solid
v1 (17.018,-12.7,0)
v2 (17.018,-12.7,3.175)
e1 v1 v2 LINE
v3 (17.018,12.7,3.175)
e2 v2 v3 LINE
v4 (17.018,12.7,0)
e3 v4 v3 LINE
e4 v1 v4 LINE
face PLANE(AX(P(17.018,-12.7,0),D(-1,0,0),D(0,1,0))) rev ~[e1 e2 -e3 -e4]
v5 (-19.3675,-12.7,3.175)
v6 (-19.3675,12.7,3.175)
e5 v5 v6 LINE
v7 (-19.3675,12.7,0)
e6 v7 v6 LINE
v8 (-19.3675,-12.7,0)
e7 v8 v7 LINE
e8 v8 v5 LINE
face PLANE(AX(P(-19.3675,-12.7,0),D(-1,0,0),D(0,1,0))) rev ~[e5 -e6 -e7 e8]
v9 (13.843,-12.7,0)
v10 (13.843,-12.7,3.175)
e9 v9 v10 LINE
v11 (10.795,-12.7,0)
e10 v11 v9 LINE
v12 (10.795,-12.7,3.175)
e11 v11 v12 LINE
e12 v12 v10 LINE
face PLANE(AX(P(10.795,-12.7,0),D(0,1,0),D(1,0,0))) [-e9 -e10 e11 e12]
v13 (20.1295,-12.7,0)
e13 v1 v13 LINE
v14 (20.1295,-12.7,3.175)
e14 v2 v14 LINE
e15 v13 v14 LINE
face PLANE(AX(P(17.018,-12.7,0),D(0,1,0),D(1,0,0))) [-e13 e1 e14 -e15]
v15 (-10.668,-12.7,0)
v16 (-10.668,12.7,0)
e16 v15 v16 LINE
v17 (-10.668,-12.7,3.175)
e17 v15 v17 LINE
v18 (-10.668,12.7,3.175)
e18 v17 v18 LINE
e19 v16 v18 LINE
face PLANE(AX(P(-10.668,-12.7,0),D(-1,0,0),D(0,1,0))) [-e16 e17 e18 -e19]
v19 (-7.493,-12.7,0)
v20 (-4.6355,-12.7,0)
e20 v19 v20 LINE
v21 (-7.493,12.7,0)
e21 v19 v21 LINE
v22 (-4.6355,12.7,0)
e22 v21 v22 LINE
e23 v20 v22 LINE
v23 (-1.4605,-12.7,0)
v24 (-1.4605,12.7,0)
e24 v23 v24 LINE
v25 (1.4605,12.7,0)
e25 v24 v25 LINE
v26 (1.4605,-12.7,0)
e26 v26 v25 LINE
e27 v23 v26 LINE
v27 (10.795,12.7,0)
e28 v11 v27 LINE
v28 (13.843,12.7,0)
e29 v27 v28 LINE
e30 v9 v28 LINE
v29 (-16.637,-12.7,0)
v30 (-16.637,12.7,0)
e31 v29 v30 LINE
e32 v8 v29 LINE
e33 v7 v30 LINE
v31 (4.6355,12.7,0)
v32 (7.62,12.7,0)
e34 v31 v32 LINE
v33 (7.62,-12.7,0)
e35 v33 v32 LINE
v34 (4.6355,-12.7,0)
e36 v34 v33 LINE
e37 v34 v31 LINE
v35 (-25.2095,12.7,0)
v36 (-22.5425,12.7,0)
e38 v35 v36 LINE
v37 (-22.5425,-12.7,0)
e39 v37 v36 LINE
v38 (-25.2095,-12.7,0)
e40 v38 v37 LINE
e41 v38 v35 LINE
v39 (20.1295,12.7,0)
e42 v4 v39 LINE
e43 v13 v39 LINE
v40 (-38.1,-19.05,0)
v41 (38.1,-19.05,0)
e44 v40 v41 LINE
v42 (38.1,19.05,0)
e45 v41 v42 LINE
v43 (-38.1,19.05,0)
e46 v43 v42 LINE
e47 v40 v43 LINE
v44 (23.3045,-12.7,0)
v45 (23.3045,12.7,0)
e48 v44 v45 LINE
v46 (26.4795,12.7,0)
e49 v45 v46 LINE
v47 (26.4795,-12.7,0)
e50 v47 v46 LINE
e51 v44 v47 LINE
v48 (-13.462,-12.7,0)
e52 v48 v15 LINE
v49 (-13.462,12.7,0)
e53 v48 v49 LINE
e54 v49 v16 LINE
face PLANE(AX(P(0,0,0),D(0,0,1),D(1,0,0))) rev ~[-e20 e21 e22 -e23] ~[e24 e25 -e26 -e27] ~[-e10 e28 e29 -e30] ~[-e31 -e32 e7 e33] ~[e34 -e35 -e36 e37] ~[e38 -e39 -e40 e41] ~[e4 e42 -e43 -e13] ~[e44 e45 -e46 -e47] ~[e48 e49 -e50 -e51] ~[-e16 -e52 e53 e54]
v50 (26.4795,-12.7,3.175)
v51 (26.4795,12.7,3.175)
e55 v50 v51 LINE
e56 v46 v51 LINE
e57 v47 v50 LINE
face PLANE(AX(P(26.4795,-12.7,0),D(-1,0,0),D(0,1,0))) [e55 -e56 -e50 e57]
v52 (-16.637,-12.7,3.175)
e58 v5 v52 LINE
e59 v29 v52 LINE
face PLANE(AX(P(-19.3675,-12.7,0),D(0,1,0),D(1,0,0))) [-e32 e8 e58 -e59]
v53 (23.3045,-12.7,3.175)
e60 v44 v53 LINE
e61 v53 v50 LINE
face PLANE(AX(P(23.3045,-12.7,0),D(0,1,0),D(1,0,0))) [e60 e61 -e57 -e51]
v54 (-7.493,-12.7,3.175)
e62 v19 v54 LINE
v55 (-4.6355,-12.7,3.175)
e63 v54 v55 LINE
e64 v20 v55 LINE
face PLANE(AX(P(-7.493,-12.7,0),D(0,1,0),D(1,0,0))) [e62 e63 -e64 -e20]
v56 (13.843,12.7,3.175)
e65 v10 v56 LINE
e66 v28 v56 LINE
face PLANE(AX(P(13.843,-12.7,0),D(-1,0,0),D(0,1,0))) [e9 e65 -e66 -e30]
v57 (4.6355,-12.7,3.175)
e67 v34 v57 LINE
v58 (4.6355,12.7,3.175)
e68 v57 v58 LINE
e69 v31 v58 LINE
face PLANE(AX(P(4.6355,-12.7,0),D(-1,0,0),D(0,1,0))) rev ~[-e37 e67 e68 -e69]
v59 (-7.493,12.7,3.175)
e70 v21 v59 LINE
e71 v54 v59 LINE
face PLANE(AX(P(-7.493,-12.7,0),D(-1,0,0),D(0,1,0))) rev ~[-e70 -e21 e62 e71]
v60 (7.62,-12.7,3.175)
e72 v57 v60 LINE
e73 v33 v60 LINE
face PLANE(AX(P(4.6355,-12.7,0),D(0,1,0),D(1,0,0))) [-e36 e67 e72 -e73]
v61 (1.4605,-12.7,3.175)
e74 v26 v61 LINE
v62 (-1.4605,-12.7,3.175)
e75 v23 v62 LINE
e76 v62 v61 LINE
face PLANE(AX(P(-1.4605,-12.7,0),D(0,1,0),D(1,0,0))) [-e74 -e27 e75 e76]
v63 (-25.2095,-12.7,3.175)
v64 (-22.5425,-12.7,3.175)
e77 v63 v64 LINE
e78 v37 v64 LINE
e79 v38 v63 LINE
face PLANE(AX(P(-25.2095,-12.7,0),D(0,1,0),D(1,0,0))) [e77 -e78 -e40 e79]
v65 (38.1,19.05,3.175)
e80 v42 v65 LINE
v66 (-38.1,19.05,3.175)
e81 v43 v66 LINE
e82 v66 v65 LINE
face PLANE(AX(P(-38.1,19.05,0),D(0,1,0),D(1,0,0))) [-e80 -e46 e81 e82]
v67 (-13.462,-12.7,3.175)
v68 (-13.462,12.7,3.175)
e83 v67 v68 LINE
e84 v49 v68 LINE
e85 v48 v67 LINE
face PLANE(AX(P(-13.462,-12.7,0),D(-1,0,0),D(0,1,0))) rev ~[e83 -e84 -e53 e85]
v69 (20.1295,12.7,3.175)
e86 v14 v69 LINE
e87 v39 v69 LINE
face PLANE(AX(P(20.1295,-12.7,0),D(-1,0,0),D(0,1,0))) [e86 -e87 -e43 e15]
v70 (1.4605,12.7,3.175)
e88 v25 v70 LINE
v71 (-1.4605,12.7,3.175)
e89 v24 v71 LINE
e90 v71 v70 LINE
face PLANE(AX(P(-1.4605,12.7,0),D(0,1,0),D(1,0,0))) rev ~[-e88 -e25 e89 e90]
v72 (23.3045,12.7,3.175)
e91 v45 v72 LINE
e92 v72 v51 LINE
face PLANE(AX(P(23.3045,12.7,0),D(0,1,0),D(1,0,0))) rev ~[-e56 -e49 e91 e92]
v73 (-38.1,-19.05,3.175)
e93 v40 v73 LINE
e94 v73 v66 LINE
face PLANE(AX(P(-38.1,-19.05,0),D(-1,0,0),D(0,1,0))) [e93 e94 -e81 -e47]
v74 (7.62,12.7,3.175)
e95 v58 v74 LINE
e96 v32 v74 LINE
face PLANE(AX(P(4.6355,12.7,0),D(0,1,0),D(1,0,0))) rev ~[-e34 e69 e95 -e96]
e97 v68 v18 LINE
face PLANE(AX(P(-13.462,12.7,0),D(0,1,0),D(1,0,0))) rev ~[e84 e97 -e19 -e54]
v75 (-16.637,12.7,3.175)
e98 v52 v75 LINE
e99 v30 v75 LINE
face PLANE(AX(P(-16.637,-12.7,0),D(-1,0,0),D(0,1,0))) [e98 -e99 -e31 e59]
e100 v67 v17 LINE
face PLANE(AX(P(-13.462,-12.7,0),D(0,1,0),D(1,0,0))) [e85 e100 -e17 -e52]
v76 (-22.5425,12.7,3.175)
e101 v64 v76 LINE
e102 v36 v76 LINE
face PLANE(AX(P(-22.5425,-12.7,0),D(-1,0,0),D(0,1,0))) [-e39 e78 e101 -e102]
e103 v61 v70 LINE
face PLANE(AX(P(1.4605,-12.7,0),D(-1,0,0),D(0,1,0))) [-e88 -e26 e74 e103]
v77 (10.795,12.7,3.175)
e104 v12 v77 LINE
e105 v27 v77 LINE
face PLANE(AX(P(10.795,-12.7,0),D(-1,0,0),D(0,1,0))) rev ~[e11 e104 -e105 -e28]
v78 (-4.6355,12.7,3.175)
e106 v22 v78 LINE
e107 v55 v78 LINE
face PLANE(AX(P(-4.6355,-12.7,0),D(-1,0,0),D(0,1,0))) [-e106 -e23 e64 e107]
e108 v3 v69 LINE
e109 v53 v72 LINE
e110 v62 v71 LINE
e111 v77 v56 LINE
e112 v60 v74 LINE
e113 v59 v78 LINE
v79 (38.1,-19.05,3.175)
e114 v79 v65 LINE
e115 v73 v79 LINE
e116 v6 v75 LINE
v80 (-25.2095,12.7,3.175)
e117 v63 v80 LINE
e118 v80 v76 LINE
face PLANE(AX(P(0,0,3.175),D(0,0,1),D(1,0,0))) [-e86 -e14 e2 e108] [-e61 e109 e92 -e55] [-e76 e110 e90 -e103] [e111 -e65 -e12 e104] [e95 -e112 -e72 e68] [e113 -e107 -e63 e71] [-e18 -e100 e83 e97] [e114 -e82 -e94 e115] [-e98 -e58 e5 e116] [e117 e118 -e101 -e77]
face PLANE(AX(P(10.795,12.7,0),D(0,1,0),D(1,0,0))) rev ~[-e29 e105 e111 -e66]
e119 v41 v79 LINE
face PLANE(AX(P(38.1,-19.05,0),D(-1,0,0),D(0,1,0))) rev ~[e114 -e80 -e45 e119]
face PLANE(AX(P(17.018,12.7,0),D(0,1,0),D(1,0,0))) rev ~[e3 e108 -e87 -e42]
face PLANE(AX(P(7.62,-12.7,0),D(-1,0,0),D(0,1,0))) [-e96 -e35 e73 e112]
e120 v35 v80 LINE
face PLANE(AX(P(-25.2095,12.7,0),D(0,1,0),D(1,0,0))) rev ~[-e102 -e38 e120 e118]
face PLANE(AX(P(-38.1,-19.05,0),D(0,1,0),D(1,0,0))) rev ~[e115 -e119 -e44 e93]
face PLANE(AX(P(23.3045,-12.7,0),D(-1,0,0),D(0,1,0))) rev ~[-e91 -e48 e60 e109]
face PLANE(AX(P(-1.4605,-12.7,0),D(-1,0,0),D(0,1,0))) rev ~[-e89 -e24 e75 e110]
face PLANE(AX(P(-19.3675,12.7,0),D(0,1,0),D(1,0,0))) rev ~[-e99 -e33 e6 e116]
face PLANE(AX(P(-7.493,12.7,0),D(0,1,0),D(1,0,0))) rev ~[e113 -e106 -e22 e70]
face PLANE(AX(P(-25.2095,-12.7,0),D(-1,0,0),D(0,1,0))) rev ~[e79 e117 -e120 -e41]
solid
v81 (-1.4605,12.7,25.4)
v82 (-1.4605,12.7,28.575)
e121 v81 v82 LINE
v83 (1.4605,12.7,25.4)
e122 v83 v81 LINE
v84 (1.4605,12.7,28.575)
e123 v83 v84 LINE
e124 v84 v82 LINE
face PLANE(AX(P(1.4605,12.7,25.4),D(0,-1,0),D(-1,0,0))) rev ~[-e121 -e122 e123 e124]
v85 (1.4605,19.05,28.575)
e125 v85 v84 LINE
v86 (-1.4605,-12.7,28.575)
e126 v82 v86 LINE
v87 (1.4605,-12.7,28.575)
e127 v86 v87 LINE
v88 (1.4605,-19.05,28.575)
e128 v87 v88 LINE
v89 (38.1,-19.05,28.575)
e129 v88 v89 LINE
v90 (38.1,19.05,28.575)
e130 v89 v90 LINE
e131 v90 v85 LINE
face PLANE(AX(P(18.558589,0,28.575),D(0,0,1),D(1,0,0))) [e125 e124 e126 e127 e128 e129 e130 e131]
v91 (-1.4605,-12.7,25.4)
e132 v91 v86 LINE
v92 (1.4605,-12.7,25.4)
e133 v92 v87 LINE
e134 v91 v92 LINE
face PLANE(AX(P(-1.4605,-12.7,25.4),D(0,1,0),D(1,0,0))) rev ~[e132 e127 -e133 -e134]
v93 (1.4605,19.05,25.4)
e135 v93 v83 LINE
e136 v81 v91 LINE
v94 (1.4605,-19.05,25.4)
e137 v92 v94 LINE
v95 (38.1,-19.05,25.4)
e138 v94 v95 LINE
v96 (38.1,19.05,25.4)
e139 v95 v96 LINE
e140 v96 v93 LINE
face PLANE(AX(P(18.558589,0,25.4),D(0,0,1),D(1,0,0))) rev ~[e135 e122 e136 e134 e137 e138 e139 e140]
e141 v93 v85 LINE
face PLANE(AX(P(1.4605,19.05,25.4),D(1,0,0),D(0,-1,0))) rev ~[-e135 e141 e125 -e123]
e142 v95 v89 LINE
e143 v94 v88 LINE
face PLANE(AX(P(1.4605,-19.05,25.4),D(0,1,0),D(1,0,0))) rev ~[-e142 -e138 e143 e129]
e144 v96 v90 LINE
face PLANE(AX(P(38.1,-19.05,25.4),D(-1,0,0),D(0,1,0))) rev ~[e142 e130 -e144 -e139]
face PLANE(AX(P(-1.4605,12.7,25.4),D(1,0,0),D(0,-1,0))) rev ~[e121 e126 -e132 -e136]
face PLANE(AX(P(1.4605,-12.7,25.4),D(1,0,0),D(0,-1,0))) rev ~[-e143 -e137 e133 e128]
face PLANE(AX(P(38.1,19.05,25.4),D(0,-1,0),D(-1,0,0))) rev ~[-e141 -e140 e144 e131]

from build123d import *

# Parameters (mm, degrees)
F1_W     = 76.2
F1_H     = 38.1
F1_W_2   = 2.667
F1_H_2   = 25.4
F1_W_3   = 2.7305
F1_W_4   = 2.794
F1_W_5   = 2.8575
F1_W_6   = 2.921
F1_W_7   = 2.9845
F1_W_8   = 3.048
F1_W_9   = 3.1115
F1_W_10  = 3.175
F2_DEPTH = 3.175
F5_DEPTH = 3.175


# Not quite as in the source:
# - a variable given as a bare number and used for a length is read in inches; the dataset says mm whatever the document's units were


with BuildPart() as f2:
    # F1 (on Top) → F2 (new body)
    with BuildSketch(Plane.XY):
        Rectangle(F1_W, F1_H)
        with Locations((-23.876, 0)):
            Rectangle(F1_W_2, F1_H_2, mode=Mode.SUBTRACT)
        with Locations((-18.00225, 0)):
            Rectangle(F1_W_3, F1_H_2, mode=Mode.SUBTRACT)
        with Locations((-12.065, 0)):
            Rectangle(F1_W_4, F1_H_2, mode=Mode.SUBTRACT)
        with Locations((-6.06425, 0)):
            Rectangle(F1_W_5, F1_H_2, mode=Mode.SUBTRACT)
        Rectangle(F1_W_6, F1_H_2, mode=Mode.SUBTRACT)
        with Locations((6.12775, 0)):
            Rectangle(F1_W_7, F1_H_2, mode=Mode.SUBTRACT)
        with Locations((12.319, 0)):
            Rectangle(F1_W_8, F1_H_2, mode=Mode.SUBTRACT)
        with Locations((18.57375, 0)):
            Rectangle(F1_W_9, F1_H_2, mode=Mode.SUBTRACT)
        with Locations((24.892, 0)):
            Rectangle(F1_W_10, F1_H_2, mode=Mode.SUBTRACT)
    extrude(amount=F2_DEPTH)


with BuildPart() as f5:
    # F4 (on offset) → F5 (new body)
    with BuildSketch(Plane.XY.offset(25.4)):
        Polygon((1.4605, 12.7), (-1.4605, 12.7), (-1.4605, -12.7), (1.4605, -12.7), (1.4605, -19.05), (38.1, -19.05), (38.1, 19.05), (1.4605, 19.05), align=None)
    extrude(amount=F5_DEPTH)


solid = Compound([f2.part, f5.part])
